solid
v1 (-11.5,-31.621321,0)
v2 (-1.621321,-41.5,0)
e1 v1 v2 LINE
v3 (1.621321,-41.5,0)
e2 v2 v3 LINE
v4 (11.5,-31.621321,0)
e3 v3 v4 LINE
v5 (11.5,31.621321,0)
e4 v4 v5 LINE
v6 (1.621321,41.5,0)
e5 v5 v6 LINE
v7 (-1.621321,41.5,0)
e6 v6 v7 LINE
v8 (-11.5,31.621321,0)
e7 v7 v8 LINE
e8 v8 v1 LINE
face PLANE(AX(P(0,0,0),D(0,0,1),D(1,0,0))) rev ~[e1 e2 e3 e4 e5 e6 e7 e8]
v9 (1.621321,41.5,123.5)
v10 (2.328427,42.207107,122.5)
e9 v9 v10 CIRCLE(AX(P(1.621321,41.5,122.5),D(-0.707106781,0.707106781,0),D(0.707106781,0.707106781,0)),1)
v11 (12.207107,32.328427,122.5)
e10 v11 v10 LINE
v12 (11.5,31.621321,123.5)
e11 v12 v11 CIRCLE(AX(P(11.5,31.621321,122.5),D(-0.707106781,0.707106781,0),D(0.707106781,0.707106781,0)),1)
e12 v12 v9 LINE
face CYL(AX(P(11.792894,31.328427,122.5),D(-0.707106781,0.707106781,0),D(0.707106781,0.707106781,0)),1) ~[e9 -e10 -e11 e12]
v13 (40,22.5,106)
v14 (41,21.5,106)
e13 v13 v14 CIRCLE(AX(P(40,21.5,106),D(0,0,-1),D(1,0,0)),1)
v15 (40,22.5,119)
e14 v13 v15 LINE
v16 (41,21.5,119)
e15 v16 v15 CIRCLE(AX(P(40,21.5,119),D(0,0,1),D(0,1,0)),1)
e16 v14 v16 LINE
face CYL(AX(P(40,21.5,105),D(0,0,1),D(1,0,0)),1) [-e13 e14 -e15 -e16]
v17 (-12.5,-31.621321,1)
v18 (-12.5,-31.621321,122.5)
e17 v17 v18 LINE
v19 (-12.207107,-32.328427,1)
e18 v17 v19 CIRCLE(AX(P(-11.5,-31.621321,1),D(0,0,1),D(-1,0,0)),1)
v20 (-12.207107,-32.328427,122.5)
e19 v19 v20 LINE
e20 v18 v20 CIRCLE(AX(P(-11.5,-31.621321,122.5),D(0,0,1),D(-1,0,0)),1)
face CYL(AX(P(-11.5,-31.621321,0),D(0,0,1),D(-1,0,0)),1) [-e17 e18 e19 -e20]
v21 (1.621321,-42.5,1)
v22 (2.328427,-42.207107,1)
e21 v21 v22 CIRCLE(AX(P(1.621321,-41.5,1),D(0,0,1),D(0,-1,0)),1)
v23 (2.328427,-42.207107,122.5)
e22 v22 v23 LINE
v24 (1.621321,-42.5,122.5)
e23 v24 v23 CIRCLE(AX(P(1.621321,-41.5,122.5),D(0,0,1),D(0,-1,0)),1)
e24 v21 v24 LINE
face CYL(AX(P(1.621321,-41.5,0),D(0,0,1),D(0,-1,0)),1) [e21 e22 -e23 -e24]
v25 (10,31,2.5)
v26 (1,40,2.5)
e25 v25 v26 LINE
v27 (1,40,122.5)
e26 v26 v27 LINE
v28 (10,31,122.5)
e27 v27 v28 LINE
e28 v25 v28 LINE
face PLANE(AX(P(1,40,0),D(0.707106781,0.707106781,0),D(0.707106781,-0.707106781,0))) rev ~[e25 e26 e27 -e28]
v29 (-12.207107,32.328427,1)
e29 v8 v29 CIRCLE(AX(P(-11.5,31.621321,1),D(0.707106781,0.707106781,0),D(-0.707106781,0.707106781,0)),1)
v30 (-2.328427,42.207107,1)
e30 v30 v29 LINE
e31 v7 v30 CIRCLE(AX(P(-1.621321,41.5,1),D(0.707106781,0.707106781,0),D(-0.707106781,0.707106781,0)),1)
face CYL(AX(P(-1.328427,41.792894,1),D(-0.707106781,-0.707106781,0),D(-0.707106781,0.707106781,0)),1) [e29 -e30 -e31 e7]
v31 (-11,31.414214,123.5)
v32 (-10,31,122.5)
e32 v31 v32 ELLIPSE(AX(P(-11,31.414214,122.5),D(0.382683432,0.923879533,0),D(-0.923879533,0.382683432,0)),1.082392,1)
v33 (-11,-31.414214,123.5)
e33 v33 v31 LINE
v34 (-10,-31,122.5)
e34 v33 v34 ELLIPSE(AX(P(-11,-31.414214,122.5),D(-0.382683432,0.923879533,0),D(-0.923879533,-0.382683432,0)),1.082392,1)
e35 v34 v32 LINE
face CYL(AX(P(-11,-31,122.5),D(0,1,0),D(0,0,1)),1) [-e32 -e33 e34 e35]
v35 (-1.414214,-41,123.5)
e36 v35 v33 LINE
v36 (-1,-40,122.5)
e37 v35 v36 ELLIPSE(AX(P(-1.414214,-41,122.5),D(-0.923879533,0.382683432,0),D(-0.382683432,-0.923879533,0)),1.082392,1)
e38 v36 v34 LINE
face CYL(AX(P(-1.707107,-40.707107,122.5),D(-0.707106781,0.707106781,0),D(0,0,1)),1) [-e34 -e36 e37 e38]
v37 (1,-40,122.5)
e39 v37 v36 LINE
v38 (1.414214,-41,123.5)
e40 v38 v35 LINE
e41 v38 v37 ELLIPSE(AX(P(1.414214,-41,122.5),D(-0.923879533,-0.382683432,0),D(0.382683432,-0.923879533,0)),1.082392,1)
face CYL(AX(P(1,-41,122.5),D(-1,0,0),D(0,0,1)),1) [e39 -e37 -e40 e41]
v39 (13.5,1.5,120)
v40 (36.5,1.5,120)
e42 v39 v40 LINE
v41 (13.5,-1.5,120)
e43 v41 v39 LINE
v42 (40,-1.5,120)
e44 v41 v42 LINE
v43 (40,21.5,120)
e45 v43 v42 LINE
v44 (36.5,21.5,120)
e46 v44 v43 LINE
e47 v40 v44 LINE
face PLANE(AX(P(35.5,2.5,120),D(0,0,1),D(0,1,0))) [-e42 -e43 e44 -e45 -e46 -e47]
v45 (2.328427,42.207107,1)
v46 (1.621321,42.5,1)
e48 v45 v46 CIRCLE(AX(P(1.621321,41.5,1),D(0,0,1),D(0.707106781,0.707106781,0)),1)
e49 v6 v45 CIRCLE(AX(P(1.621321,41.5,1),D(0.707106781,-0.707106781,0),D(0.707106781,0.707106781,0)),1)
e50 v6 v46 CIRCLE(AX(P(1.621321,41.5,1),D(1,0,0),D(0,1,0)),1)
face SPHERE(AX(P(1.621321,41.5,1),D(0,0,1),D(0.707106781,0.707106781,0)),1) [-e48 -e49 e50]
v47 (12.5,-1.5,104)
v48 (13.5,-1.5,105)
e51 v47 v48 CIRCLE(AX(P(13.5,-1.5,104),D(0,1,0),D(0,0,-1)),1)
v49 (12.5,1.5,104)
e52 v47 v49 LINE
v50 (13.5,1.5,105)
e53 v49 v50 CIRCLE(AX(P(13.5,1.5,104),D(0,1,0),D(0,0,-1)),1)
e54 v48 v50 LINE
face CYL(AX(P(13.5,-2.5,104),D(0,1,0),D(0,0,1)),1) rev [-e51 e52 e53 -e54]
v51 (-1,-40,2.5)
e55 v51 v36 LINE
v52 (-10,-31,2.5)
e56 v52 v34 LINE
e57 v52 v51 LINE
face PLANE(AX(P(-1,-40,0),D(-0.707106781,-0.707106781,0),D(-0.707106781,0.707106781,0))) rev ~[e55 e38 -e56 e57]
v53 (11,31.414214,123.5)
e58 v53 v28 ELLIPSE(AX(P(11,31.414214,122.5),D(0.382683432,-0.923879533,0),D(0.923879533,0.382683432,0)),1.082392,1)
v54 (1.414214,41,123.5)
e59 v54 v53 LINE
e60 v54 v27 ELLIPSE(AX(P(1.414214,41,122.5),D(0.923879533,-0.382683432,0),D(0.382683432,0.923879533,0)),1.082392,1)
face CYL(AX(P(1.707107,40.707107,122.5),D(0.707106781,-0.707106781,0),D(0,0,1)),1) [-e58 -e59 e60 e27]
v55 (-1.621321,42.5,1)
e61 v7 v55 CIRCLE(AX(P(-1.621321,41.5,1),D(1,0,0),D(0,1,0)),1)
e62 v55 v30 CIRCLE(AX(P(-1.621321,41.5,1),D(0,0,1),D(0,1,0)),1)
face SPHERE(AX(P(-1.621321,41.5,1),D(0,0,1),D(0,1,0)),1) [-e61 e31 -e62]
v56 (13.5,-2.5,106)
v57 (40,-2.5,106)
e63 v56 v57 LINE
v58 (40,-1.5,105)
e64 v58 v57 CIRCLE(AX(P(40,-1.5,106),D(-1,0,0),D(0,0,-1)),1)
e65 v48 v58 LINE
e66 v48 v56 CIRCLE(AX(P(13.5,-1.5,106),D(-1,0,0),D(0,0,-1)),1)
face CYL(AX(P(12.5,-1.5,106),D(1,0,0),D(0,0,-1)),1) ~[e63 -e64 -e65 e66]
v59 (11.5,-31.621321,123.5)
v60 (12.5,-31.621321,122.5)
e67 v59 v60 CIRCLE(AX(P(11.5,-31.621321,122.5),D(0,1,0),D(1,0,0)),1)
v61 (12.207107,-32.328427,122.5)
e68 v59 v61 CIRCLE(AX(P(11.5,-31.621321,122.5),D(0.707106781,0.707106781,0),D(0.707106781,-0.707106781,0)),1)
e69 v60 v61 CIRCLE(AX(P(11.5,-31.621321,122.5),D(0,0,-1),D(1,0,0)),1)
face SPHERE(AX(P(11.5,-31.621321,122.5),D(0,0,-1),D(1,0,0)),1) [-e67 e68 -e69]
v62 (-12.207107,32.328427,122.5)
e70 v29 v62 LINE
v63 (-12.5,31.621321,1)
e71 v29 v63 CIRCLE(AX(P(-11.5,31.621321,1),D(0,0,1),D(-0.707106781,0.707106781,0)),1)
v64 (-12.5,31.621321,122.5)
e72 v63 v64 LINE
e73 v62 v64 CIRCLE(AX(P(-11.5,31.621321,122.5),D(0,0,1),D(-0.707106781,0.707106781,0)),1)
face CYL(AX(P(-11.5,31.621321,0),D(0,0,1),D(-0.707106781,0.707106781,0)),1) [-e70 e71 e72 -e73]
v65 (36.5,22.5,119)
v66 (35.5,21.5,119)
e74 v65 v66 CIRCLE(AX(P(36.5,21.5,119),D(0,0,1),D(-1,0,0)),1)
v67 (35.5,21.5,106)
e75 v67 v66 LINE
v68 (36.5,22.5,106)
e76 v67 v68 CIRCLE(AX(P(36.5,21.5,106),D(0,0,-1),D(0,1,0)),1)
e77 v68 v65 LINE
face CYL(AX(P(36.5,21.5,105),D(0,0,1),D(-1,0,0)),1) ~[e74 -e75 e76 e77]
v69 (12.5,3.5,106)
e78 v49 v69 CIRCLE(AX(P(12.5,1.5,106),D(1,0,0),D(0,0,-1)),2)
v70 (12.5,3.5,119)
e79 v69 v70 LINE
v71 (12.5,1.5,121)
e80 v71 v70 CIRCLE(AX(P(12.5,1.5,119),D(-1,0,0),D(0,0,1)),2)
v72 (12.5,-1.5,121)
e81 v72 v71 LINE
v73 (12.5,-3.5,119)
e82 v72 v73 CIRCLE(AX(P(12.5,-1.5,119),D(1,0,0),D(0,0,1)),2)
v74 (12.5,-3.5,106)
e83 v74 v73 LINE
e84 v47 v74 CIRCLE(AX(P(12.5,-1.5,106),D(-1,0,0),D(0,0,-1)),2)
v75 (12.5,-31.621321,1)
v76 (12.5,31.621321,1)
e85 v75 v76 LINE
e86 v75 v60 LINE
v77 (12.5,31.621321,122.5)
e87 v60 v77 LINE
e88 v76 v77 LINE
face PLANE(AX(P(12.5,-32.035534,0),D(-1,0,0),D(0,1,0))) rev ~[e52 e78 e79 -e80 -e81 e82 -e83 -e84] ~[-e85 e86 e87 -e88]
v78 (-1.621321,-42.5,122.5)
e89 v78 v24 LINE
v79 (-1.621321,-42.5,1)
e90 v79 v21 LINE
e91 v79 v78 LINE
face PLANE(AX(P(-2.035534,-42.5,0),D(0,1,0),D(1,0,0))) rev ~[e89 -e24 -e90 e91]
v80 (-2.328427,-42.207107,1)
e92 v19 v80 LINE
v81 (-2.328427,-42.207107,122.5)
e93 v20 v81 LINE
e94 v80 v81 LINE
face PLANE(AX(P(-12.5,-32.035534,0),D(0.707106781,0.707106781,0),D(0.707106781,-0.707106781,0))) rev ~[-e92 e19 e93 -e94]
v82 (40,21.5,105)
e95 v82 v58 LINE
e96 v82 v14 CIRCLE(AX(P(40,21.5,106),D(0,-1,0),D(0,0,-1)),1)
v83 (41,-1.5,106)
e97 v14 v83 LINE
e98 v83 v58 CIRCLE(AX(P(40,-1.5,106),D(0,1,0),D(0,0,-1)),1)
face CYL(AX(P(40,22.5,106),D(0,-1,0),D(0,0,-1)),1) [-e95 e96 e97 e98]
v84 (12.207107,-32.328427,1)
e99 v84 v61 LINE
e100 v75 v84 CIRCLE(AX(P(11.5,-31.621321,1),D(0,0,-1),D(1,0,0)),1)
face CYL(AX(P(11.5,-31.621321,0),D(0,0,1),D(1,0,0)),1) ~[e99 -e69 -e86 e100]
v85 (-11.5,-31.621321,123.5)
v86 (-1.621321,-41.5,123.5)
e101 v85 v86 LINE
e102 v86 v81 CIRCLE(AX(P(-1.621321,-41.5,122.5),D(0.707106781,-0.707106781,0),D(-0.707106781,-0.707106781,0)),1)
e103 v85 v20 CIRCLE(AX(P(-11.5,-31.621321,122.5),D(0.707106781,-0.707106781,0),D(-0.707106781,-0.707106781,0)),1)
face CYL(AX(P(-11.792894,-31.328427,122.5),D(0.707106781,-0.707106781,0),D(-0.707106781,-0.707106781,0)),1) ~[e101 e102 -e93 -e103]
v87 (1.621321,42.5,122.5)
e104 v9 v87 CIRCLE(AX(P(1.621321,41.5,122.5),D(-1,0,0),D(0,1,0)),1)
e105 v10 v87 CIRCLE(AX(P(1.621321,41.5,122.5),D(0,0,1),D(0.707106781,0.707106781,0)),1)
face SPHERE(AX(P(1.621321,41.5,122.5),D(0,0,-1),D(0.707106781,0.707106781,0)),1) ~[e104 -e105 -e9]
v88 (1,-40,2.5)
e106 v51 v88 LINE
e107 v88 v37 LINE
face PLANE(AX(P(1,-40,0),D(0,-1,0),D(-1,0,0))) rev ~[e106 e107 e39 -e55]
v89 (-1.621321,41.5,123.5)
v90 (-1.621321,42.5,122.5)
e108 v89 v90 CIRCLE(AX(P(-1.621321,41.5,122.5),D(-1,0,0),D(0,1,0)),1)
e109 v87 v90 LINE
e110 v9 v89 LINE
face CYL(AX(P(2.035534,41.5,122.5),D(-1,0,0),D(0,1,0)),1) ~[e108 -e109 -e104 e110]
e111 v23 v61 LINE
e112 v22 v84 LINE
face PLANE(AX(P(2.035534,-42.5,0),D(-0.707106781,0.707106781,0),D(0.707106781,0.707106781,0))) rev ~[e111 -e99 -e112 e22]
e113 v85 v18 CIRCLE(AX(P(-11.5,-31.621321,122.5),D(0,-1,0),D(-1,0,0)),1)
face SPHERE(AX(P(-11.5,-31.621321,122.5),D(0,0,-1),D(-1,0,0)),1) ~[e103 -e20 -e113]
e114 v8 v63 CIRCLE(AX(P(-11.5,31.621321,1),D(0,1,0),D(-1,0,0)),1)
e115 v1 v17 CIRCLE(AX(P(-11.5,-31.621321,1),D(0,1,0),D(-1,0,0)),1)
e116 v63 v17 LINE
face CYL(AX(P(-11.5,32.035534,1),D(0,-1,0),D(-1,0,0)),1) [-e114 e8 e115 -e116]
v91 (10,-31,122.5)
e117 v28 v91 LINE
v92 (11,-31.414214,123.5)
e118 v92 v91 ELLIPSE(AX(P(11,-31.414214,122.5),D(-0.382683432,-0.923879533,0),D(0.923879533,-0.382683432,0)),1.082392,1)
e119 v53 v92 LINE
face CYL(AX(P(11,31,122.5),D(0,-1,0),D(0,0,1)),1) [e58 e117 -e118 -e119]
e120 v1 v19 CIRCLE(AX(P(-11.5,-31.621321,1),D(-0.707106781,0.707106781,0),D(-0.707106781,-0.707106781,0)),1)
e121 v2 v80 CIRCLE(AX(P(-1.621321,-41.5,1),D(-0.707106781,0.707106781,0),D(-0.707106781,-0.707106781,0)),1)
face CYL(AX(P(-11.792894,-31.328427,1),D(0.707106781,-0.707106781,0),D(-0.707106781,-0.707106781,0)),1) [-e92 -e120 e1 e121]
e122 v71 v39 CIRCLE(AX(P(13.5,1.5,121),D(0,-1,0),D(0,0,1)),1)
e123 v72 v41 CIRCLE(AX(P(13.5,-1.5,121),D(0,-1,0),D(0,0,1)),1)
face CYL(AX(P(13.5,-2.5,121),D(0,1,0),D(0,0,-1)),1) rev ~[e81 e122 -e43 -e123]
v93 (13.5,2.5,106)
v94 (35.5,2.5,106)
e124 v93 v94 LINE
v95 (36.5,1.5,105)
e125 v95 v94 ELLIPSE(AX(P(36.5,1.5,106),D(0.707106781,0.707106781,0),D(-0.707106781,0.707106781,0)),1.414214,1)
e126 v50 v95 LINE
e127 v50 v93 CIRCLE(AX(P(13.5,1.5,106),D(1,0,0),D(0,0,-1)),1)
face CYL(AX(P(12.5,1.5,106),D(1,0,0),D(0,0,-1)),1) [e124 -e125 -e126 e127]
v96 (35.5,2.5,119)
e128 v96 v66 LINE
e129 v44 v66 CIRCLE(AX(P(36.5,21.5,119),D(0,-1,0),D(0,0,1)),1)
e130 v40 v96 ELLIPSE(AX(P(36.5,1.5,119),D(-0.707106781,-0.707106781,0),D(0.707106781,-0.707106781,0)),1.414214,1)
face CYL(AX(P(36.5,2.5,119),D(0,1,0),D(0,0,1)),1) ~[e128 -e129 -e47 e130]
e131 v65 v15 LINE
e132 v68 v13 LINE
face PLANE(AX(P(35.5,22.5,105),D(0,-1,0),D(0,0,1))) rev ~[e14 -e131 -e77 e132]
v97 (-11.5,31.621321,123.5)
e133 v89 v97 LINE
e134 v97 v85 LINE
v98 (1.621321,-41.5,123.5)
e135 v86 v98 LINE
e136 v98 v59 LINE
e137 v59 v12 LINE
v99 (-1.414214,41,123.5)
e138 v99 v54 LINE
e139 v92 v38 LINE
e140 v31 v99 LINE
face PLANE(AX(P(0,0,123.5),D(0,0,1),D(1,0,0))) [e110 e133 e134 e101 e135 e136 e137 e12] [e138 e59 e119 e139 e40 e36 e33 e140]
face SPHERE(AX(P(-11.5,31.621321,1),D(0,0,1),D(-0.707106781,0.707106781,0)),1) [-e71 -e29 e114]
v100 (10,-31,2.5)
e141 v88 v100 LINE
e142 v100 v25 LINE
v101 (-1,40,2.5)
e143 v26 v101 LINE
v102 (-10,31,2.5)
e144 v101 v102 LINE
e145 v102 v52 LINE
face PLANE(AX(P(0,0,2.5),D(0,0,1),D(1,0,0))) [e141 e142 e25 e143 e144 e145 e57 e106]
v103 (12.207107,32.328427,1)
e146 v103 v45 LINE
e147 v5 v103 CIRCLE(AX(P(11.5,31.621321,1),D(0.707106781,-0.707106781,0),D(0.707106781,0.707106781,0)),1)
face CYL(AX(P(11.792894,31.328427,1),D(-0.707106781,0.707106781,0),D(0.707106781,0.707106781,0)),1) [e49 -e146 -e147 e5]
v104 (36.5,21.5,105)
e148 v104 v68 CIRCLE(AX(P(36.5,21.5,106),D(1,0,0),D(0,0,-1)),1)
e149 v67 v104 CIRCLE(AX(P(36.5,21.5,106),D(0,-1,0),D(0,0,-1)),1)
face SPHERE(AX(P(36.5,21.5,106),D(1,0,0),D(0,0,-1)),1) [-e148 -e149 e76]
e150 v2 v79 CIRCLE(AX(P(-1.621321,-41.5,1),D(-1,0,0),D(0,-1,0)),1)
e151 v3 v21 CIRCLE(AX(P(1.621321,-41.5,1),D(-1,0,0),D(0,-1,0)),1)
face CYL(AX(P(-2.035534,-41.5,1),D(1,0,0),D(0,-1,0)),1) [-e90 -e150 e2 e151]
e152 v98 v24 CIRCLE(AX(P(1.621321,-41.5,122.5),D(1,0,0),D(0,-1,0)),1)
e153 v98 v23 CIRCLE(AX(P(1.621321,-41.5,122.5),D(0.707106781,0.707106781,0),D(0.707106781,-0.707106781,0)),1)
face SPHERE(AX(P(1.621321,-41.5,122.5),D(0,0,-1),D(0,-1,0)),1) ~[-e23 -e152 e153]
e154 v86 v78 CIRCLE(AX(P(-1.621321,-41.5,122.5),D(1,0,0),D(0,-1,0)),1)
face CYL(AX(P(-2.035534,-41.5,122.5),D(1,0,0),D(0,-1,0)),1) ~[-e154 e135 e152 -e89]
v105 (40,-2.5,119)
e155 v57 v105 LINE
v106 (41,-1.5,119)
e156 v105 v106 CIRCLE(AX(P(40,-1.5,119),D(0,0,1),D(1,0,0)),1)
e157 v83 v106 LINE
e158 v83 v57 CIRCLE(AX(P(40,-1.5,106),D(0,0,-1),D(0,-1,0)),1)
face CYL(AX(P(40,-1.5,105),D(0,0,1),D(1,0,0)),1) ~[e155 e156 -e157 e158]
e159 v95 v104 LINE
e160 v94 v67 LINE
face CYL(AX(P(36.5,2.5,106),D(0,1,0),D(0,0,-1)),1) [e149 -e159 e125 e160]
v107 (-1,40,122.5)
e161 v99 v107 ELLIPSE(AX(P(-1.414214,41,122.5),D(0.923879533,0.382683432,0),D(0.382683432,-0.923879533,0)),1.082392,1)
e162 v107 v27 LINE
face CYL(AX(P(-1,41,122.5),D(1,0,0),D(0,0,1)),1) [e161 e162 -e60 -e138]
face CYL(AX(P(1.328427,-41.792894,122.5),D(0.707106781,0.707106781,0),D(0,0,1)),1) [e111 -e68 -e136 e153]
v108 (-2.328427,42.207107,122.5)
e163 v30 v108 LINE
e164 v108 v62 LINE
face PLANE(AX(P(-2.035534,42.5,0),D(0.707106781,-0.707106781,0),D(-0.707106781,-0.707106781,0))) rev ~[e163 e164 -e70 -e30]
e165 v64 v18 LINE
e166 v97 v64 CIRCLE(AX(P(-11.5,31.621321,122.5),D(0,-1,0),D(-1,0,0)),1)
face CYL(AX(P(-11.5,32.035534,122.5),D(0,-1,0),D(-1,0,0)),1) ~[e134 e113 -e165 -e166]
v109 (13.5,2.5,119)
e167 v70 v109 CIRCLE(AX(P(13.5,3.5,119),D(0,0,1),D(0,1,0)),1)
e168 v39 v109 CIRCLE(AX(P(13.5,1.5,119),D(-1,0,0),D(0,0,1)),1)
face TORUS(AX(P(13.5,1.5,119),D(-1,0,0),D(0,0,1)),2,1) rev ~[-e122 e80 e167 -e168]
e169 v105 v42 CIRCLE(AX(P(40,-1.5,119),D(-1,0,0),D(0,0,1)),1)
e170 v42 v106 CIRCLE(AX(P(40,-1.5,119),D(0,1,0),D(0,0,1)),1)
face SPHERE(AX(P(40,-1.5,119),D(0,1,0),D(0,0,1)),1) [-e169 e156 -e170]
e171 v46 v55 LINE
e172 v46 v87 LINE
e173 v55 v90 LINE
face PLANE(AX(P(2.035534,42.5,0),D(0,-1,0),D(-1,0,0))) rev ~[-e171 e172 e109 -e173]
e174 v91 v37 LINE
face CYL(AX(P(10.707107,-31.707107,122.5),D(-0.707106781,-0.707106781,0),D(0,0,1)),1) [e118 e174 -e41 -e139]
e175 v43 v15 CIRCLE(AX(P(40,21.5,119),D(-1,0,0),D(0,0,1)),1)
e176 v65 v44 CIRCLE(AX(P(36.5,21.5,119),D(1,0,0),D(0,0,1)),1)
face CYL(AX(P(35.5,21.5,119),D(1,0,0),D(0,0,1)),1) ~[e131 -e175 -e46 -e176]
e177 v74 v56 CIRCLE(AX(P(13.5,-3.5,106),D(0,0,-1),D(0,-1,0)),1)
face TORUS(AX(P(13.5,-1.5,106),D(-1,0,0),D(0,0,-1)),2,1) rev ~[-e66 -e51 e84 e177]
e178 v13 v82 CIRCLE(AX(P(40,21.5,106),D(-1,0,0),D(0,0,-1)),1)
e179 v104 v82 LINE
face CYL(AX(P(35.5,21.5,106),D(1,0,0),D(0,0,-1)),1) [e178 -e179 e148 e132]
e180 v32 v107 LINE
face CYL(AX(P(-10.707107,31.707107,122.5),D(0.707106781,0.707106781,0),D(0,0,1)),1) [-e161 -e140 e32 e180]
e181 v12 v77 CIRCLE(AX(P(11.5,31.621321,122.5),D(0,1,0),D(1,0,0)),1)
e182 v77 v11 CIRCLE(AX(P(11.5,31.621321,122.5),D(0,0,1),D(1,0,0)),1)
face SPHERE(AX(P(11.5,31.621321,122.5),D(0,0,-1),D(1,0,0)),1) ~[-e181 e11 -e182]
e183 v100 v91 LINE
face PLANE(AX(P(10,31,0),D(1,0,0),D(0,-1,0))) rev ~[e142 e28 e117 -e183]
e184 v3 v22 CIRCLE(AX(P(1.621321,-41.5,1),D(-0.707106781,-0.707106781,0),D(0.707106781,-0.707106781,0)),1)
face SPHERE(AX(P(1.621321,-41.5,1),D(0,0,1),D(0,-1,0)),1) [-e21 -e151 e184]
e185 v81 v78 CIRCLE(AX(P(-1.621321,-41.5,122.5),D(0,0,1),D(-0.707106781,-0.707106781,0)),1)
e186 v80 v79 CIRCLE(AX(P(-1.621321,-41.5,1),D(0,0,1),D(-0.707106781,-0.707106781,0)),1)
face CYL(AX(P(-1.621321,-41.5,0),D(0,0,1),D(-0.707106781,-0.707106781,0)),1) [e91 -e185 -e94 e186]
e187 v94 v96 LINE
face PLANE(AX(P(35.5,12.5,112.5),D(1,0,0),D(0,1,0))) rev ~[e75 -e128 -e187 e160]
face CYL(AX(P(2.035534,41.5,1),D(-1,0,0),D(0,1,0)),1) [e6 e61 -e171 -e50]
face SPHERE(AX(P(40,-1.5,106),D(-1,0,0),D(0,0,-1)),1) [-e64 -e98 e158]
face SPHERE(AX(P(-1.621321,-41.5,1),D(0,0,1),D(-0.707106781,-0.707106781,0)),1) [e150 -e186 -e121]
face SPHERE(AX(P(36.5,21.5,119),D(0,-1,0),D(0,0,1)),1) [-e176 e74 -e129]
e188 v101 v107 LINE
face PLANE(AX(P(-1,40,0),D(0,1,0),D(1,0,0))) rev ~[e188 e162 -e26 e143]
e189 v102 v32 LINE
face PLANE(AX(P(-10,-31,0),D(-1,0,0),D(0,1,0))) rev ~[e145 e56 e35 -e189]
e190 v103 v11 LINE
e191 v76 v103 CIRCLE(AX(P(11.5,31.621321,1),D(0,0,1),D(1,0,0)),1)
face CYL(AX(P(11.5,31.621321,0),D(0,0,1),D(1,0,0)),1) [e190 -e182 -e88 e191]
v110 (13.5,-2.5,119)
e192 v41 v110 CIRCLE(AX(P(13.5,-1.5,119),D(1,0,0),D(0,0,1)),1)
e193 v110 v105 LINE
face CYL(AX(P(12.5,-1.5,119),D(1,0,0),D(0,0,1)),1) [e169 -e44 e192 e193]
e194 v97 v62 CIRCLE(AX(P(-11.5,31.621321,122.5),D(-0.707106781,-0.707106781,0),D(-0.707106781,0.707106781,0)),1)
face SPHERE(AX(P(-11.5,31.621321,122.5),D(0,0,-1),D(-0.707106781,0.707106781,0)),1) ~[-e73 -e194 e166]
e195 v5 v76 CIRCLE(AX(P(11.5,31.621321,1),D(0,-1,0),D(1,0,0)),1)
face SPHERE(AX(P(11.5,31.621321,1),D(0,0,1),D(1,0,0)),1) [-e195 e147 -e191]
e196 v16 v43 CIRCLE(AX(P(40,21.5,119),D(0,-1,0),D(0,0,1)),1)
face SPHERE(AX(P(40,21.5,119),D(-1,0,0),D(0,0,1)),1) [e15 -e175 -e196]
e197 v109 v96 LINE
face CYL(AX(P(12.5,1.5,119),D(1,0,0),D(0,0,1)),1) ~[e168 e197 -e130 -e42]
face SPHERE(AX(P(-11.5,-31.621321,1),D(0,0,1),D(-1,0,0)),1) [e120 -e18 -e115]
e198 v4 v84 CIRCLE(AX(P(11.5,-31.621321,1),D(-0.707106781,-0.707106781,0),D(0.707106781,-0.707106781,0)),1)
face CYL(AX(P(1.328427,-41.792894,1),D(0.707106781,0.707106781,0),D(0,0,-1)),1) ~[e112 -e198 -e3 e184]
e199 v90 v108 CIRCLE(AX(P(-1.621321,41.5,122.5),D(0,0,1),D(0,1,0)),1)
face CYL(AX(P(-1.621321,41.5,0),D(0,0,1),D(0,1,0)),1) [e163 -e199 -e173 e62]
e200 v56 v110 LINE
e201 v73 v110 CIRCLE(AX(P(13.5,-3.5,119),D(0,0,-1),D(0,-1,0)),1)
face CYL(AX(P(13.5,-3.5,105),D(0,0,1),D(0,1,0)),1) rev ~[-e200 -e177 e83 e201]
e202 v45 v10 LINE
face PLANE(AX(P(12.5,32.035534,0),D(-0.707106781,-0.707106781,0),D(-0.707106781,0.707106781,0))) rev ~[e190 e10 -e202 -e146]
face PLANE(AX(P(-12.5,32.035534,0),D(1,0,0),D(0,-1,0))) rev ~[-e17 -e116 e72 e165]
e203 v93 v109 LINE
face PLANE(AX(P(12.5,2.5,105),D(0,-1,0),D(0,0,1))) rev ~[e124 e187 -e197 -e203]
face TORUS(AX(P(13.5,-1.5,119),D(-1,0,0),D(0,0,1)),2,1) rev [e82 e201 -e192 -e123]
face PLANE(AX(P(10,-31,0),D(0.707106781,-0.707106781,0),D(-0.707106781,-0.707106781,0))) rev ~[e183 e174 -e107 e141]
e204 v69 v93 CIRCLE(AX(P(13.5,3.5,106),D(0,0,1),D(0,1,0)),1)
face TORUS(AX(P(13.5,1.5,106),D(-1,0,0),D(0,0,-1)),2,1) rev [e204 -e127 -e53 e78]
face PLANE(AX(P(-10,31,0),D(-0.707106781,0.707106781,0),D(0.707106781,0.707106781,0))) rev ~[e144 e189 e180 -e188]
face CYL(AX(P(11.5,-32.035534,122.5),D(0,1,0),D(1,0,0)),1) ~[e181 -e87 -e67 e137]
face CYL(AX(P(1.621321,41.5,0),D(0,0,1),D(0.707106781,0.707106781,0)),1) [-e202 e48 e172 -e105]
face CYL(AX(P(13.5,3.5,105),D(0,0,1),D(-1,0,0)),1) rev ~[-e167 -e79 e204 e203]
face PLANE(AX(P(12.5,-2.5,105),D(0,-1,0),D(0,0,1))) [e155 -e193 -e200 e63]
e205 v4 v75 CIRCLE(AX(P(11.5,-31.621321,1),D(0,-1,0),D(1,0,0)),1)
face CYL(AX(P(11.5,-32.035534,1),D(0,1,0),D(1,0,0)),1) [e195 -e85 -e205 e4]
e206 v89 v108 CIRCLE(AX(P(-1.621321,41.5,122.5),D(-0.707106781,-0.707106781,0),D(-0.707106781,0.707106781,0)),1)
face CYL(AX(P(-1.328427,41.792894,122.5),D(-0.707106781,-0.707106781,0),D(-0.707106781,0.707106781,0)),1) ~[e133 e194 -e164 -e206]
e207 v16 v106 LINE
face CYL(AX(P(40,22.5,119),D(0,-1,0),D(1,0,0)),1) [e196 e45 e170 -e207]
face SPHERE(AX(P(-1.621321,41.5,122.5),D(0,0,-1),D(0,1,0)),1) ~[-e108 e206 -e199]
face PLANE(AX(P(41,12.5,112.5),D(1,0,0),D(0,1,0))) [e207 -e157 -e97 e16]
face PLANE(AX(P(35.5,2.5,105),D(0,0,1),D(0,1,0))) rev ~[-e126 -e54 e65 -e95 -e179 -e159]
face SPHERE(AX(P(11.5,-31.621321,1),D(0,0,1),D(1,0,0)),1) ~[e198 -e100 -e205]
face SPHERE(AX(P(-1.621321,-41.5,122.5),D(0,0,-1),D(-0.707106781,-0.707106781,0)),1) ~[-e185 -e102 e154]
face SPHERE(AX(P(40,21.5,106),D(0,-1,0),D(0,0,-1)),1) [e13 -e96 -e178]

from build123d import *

# Parameters (mm, degrees)
F1_DEPTH = 2.5
F2_DEPTH = 123.5
F3_W     = 5
F3_H     = 15
F4_DEPTH = 28.5
F5_START = 23
F3_W_2   = 20
F5_DEPTH = 5.5
F6_R     = 1


with BuildPart() as f1:
    # F0 (on Top) → F1 (new body)
    with BuildSketch(Plane.XY):
        Polygon((10, 31), (1, 40), (-1, 40), (-10, 31), (-10, -31), (-1, -40), (1, -40), (10, -31), align=None)
    extrude(amount=F1_DEPTH)

    # F0 (on Top) → F2 (join)
    with BuildSketch(Plane.XY):
        Polygon((12.500000447, -32.0355340911), (12.500000447, 32.0355340911), (2.0355340911, 42.500000447), (-2.0355340911, 42.500000447), (-12.500000447, 32.0355340911), (-12.500000447, -32.0355340911), (-2.0355340911, -42.500000447), (2.0355340911, -42.500000447), align=None)
        Polygon((-1, 40), (1, 40), (10, 31), (10, -31), (1, -40), (-1, -40), (-10, -31), (-10, 31), align=None, mode=Mode.SUBTRACT)
    extrude(amount=F2_DEPTH)

    # F3 (on face) → F4 (join)
    with BuildSketch(Plane.YZ.offset(12.500000447)):
        with Locations((-4.47e-07, 112.5)):
            Rectangle(F3_W, F3_H)
    extrude(amount=F4_DEPTH)

    # F3 (on face) → F5 (join)
    with BuildSketch(Plane.YZ.offset(12.500000447).offset(F5_START)):
        with Locations((12.499999553, 112.5)):
            Rectangle(F3_W_2, F3_H)
    extrude(amount=F5_DEPTH)

    # F6
    f6_edges = [f1.edges().sort_by_distance(p)[0] for p in [
        (12.5, 0, 123.5),
        (7.267767, 37.267767, 123.5),
        (0, 42.5, 123.5),
        (-7.267767, 37.267767, 123.5),
        (-12.5, 0, 123.5),
        (-7.267767, -37.267767, 123.5),
        (0, -42.5, 123.5),
        (7.267767, -37.267767, 123.5),
        (0, 40, 123.5),
        (5.5, 35.5, 123.5),
        (10, 0, 123.5),
        (5.5, -35.5, 123.5),
        (0, -40, 123.5),
        (-5.5, -35.5, 123.5),
        (-10, 0, 123.5),
        (-5.5, 35.5, 123.5),
        (24, 2.5, 120),
        (35.5, 12.5, 120),
        (38.25, 22.5, 120),
        (41, 10, 120),
        (26.75, -2.5, 120),
        (12.5, 0, 120),
        (26.75, -2.5, 105),
        (41, 10, 105),
        (38.25, 22.5, 105),
        (35.5, 12.5, 105),
        (24, 2.5, 105),
        (12.5, 0, 105),
        (12.5, 0, 0),
        (7.267767, 37.267767, 0),
        (0, 42.5, 0),
        (-7.267767, 37.267767, 0),
        (-12.5, 0, 0),
        (-7.267767, -37.267767, 0),
        (0, -42.5, 0),
        (7.267767, -37.267767, 0),
        (-2.035534, 42.5, 61.75),
        (-12.5, 32.035534, 61.75),
        (-12.5, -32.035534, 61.75),
        (-2.035534, -42.5, 61.75),
        (2.035534, 42.5, 61.75),
        (12.5, 32.035534, 61.75),
        (12.5, -32.035534, 61.75),
        (2.035534, -42.5, 61.75),
        (35.5, 22.5, 112.5),
        (41, 22.5, 112.5),
        (41, -2.5, 112.5),
        (12.5, 2.5, 112.5),
        (12.5, -2.5, 112.5),
    ]]
    fillet(f6_edges, radius=F6_R)


solid = f1.part
